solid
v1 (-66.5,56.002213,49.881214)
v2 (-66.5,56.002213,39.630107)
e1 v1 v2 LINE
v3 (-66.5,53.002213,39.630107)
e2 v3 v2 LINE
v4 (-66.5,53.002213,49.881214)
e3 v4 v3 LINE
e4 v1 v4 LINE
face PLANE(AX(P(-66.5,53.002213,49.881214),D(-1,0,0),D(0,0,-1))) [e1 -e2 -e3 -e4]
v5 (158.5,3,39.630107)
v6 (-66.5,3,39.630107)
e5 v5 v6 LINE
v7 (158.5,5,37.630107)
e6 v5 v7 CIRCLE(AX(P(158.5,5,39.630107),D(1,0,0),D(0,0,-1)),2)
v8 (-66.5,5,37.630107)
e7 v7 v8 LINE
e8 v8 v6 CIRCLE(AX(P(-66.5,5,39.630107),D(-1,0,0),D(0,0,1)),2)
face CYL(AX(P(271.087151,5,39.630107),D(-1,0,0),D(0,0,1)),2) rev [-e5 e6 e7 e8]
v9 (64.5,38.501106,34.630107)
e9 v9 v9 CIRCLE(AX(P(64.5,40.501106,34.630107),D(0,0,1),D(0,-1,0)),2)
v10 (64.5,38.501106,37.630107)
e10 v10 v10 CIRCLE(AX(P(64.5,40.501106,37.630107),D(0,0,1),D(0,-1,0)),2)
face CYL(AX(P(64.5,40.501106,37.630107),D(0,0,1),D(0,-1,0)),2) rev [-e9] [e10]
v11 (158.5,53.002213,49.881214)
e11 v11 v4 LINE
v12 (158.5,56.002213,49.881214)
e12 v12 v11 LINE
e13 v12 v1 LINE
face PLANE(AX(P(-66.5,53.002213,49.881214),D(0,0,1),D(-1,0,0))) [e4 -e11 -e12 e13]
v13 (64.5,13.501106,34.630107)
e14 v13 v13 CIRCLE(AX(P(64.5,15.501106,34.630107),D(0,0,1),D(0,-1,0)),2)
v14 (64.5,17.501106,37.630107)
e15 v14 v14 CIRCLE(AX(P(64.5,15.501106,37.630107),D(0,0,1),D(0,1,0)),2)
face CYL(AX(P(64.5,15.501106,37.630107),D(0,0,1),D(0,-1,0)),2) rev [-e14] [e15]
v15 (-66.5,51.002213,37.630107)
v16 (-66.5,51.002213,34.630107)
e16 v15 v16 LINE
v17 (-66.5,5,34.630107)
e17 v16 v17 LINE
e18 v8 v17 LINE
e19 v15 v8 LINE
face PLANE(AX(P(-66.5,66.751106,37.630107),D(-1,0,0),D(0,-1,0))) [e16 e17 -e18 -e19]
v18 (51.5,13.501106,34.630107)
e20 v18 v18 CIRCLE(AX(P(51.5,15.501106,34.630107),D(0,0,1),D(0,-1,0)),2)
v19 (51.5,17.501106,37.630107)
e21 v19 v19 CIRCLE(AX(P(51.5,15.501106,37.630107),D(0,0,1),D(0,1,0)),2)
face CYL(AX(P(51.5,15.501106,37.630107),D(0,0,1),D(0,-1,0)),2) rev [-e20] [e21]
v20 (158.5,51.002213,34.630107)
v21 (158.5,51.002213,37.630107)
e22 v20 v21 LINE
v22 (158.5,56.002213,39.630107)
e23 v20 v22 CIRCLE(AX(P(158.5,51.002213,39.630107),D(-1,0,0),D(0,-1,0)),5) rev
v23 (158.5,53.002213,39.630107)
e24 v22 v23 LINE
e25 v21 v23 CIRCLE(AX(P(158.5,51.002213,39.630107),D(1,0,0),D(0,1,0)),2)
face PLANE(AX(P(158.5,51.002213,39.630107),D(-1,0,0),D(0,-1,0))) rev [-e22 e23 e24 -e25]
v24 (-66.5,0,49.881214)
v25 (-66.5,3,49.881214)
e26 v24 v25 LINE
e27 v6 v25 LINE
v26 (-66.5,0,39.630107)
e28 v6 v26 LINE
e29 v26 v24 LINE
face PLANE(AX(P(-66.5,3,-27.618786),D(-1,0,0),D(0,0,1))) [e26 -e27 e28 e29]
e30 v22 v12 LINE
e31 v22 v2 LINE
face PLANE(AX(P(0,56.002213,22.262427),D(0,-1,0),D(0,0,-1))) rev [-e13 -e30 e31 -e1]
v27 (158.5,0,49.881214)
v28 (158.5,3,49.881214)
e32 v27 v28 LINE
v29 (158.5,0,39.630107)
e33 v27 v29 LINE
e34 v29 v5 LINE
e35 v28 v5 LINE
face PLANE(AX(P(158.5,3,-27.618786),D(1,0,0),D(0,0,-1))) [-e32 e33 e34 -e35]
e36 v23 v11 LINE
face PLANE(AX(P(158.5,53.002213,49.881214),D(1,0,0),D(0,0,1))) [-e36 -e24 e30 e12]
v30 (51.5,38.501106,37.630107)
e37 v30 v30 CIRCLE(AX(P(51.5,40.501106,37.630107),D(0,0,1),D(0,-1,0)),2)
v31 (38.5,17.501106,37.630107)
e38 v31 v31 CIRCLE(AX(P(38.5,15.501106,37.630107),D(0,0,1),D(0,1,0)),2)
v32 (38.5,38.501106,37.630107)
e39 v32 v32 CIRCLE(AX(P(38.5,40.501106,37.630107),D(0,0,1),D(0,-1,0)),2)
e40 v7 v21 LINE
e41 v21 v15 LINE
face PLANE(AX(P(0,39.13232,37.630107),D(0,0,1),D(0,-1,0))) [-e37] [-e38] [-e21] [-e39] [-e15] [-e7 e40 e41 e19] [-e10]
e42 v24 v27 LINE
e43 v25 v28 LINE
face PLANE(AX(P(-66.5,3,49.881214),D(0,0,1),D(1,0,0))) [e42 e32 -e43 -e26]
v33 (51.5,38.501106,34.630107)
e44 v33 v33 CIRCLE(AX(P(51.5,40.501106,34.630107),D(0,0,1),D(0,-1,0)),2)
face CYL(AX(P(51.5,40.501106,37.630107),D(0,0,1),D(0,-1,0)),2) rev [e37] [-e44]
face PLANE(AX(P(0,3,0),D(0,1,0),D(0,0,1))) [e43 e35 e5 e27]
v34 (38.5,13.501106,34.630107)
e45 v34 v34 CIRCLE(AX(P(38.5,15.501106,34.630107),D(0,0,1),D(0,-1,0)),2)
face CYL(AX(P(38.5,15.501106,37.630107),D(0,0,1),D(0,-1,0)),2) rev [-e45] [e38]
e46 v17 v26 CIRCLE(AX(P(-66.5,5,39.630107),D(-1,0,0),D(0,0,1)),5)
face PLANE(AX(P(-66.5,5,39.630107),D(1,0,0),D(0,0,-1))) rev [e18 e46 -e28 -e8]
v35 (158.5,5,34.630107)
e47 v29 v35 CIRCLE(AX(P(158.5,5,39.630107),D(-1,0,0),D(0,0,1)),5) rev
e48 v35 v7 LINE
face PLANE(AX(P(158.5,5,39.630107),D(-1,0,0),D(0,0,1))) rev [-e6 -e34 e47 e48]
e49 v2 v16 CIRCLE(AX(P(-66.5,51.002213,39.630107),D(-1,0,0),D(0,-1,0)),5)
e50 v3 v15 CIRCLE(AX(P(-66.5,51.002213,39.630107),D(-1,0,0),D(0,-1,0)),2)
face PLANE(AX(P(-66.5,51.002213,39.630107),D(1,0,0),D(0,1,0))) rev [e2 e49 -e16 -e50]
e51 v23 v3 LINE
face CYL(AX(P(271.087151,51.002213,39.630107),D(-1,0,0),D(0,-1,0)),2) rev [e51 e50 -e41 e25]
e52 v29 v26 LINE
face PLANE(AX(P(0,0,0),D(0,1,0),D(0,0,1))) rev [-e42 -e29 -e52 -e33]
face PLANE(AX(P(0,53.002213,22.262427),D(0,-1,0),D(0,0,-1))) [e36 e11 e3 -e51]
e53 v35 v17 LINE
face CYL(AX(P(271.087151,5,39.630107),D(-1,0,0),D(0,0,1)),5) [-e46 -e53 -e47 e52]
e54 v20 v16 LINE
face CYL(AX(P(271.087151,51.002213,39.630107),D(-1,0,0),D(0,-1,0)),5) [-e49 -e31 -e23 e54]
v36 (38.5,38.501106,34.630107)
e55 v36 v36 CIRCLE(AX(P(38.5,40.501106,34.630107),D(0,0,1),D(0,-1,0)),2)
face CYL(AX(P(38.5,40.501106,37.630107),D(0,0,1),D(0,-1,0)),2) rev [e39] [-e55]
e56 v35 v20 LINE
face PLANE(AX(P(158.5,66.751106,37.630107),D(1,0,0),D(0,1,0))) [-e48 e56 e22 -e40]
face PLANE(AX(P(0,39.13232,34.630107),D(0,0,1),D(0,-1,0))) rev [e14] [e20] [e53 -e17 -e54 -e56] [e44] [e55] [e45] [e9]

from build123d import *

# Parameters (mm, degrees)
SKETCH1_W                  = 225
SKETCH1_H                  = 77.5
SKETCH1_R                  = 2
BOSS_EXTRUDE1_DEPTH        = 3
SKETCHED_START             = -27.618786464
SKETCHED_BEND1_OUTLINE_W   = 225
SKETCHED_BEND1_OUTLINE_H   = 3
SKETCHED_BEND1_DEPTH       = 62.248893571
SKETCHED_START_2           = 35.116407107
SKETCHED_BEND1_2_OUTLINE_W = 225
SKETCHED_BEND1_2_OUTLINE_H = 50.002212856
SKETCHED_BEND1_2_OUTLINE_R = 2
SKETCHED_BEND1_2_DEPTH     = 2.5137
SKETCHED_START_3           = 39.630107107
SKETCHED_BEND1_3_OUTLINE_W = 225
SKETCHED_BEND1_3_OUTLINE_H = 3
SKETCHED_BEND1_3_DEPTH     = 10.251106429
SKETCHED_START_4           = 34.630107107
SKETCHED_BEND1_4_OUTLINE_W = 225
SKETCHED_BEND1_4_OUTLINE_H = 3
SKETCHED_BEND1_4_DEPTH     = 0.28314
SKETCHED_BEND1_5_OUTLINE_W = 225
SKETCHED_BEND1_5_OUTLINE_H = 50.002212856
SKETCHED_BEND1_5_OUTLINE_R = 2
SKETCHED_BEND1_5_DEPTH     = 5
SKETCHED_START_5           = -66.5
SKETCHED_BEND1_6_DEPTH     = 225
SKETCHED_BEND1_7_DEPTH     = 225


with BuildPart() as part:
    # Sketch1 → Boss-Extrude1 (new body)
    with BuildSketch(Plane(origin=(0, 0, 0), x_dir=(1, 0, 0), z_dir=(0, 1, 0))):
        with Locations((46, -11.131213536)):
            Rectangle(SKETCH1_W, SKETCH1_H)
        with Locations(Location((38.5, 1.368786464, 0), (0, 0, 270))):
            Circle(SKETCH1_R, mode=Mode.SUBTRACT)
        with Locations(Location((38.5, -23.631213536, 0), (0, 0, 90))):
            Circle(SKETCH1_R, mode=Mode.SUBTRACT)
        with Locations(Location((51.5, 1.368786464, 0), (0, 0, 270))):
            Circle(SKETCH1_R, mode=Mode.SUBTRACT)
        with Locations(Location((51.5, -23.631213536, 0), (0, 0, 90))):
            Circle(SKETCH1_R, mode=Mode.SUBTRACT)
        with Locations(Location((64.5, 1.368786464, 0), (0, 0, 270))):
            Circle(SKETCH1_R, mode=Mode.SUBTRACT)
        with Locations(Location((64.5, -23.631213536, 0), (0, 0, 90))):
            Circle(SKETCH1_R, mode=Mode.SUBTRACT)
    extrude(amount=BOSS_EXTRUDE1_DEPTH)

    # Sketched Bend1: read off the stored shape, not the designer's step
    # Sketched Bend1 outline → Sketched Bend1 (cut)
    with BuildSketch(Plane.XY.offset(SKETCHED_START)):
        with Locations((46, 1.5)):
            Rectangle(SKETCHED_BEND1_OUTLINE_W, SKETCHED_BEND1_OUTLINE_H)
    extrude(amount=SKETCHED_BEND1_DEPTH, mode=Mode.SUBTRACT)

    # Sketched Bend1 2 outline → Sketched Bend1 2 (add)
    with BuildSketch(Plane.XY.offset(SKETCHED_START_2)):
        with Locations((46, 28.001106428)):
            Rectangle(SKETCHED_BEND1_2_OUTLINE_W, SKETCHED_BEND1_2_OUTLINE_H)
        with Locations((38.5, 15.501106428)):
            Circle(SKETCHED_BEND1_2_OUTLINE_R, mode=Mode.SUBTRACT)
        with Locations((51.5, 15.501106428)):
            Circle(SKETCHED_BEND1_2_OUTLINE_R, mode=Mode.SUBTRACT)
        with Locations((64.5, 15.501106428)):
            Circle(SKETCHED_BEND1_2_OUTLINE_R, mode=Mode.SUBTRACT)
        with Locations((38.5, 40.501106428)):
            Circle(SKETCHED_BEND1_2_OUTLINE_R, mode=Mode.SUBTRACT)
        with Locations((51.5, 40.501106428)):
            Circle(SKETCHED_BEND1_2_OUTLINE_R, mode=Mode.SUBTRACT)
        with Locations((64.5, 40.501106428)):
            Circle(SKETCHED_BEND1_2_OUTLINE_R, mode=Mode.SUBTRACT)
    extrude(amount=SKETCHED_BEND1_2_DEPTH)

    # Sketched Bend1 4 outline → Sketched Bend1 4 (cut)
    with BuildSketch(Plane.XY.offset(SKETCHED_START_4)):
        with Locations((46, 1.5)):
            Rectangle(SKETCHED_BEND1_4_OUTLINE_W, SKETCHED_BEND1_4_OUTLINE_H)
    extrude(amount=SKETCHED_BEND1_4_DEPTH, mode=Mode.SUBTRACT)



with BuildPart() as body_2:
    # Sketched Bend1 3 outline → Sketched Bend1 3 (new body)
    with BuildSketch(Plane.XY.offset(SKETCHED_START_3)):
        with Locations((46, 54.502212856)):
            Rectangle(SKETCHED_BEND1_3_OUTLINE_W, SKETCHED_BEND1_3_OUTLINE_H)
    extrude(amount=SKETCHED_BEND1_3_DEPTH)


with BuildPart() as part_1:
    add(part.part)

    add(body_2.part)  # Sketched Bend1 5 merges body 2
    # Sketched Bend1 5 outline → Sketched Bend1 5 (add)
    with BuildSketch(Plane.XY.offset(SKETCHED_START_4)):
        with Locations((46, 28.001106428)):
            Rectangle(SKETCHED_BEND1_5_OUTLINE_W, SKETCHED_BEND1_5_OUTLINE_H)
        with Locations((38.5, 15.501106428)):
            Circle(SKETCHED_BEND1_5_OUTLINE_R, mode=Mode.SUBTRACT)
        with Locations((51.5, 15.501106428)):
            Circle(SKETCHED_BEND1_5_OUTLINE_R, mode=Mode.SUBTRACT)
        with Locations((64.5, 15.501106428)):
            Circle(SKETCHED_BEND1_5_OUTLINE_R, mode=Mode.SUBTRACT)
        with Locations((38.5, 40.501106428)):
            Circle(SKETCHED_BEND1_5_OUTLINE_R, mode=Mode.SUBTRACT)
        with Locations((51.5, 40.501106428)):
            Circle(SKETCHED_BEND1_5_OUTLINE_R, mode=Mode.SUBTRACT)
        with Locations((64.5, 40.501106428)):
            Circle(SKETCHED_BEND1_5_OUTLINE_R, mode=Mode.SUBTRACT)
    extrude(amount=SKETCHED_BEND1_5_DEPTH)

    # Sketched Bend1 6 outline → Sketched Bend1 6 (cut)
    with BuildSketch(Plane.YZ.offset(SKETCHED_START_5)):
        with BuildLine():
            Line((3, 34.630107107), (5, 34.630107107))
            ThreePointArc((5, 34.630107107), (1.464466094, 36.094573201), (0, 39.630107107))
            Line((0, 39.630107107), (0, 34.913247107))
            Line((0, 34.913247107), (3, 34.913247107))
            Line((3, 34.913247107), (3, 34.630107107))
        make_face()
        with BuildLine():
            Line((53.002212856, 34.630107107), (53.002212856, 35.047531413))
            ThreePointArc((53.002212856, 35.047531413), (52.023761074, 34.735575543), (51.002212856, 34.630107107))
            Line((51.002212856, 34.630107107), (53.002212856, 34.630107107))
        make_face()
        with BuildLine():
            Line((5, 37.630107107), (51.002212856, 37.630107107))
            ThreePointArc((51.002212856, 37.630107107), (52.416426419, 38.215893545), (53.002212856, 39.630107107))
            Line((53.002212856, 39.630107107), (3, 39.630107107))
            ThreePointArc((3, 39.630107107), (3.585786438, 38.215893545), (5, 37.630107107))
        make_face()
    extrude(amount=SKETCHED_BEND1_6_DEPTH, mode=Mode.SUBTRACT)

    # Sketched Bend1 7 outline → Sketched Bend1 7 (add)
    with BuildSketch(Plane.YZ.offset(SKETCHED_START_5)):
        with BuildLine():
            Line((56.002212856, 39.630107107), (53.002212856, 39.630107107))
            Line((53.002212856, 39.630107107), (53.002212856, 35.047531413))
            ThreePointArc((53.002212856, 35.047531413), (55.185512988, 36.89149432), (56.002212856, 39.630107107))
        make_face()
    extrude(amount=SKETCHED_BEND1_7_DEPTH)


solid = part_1.part
